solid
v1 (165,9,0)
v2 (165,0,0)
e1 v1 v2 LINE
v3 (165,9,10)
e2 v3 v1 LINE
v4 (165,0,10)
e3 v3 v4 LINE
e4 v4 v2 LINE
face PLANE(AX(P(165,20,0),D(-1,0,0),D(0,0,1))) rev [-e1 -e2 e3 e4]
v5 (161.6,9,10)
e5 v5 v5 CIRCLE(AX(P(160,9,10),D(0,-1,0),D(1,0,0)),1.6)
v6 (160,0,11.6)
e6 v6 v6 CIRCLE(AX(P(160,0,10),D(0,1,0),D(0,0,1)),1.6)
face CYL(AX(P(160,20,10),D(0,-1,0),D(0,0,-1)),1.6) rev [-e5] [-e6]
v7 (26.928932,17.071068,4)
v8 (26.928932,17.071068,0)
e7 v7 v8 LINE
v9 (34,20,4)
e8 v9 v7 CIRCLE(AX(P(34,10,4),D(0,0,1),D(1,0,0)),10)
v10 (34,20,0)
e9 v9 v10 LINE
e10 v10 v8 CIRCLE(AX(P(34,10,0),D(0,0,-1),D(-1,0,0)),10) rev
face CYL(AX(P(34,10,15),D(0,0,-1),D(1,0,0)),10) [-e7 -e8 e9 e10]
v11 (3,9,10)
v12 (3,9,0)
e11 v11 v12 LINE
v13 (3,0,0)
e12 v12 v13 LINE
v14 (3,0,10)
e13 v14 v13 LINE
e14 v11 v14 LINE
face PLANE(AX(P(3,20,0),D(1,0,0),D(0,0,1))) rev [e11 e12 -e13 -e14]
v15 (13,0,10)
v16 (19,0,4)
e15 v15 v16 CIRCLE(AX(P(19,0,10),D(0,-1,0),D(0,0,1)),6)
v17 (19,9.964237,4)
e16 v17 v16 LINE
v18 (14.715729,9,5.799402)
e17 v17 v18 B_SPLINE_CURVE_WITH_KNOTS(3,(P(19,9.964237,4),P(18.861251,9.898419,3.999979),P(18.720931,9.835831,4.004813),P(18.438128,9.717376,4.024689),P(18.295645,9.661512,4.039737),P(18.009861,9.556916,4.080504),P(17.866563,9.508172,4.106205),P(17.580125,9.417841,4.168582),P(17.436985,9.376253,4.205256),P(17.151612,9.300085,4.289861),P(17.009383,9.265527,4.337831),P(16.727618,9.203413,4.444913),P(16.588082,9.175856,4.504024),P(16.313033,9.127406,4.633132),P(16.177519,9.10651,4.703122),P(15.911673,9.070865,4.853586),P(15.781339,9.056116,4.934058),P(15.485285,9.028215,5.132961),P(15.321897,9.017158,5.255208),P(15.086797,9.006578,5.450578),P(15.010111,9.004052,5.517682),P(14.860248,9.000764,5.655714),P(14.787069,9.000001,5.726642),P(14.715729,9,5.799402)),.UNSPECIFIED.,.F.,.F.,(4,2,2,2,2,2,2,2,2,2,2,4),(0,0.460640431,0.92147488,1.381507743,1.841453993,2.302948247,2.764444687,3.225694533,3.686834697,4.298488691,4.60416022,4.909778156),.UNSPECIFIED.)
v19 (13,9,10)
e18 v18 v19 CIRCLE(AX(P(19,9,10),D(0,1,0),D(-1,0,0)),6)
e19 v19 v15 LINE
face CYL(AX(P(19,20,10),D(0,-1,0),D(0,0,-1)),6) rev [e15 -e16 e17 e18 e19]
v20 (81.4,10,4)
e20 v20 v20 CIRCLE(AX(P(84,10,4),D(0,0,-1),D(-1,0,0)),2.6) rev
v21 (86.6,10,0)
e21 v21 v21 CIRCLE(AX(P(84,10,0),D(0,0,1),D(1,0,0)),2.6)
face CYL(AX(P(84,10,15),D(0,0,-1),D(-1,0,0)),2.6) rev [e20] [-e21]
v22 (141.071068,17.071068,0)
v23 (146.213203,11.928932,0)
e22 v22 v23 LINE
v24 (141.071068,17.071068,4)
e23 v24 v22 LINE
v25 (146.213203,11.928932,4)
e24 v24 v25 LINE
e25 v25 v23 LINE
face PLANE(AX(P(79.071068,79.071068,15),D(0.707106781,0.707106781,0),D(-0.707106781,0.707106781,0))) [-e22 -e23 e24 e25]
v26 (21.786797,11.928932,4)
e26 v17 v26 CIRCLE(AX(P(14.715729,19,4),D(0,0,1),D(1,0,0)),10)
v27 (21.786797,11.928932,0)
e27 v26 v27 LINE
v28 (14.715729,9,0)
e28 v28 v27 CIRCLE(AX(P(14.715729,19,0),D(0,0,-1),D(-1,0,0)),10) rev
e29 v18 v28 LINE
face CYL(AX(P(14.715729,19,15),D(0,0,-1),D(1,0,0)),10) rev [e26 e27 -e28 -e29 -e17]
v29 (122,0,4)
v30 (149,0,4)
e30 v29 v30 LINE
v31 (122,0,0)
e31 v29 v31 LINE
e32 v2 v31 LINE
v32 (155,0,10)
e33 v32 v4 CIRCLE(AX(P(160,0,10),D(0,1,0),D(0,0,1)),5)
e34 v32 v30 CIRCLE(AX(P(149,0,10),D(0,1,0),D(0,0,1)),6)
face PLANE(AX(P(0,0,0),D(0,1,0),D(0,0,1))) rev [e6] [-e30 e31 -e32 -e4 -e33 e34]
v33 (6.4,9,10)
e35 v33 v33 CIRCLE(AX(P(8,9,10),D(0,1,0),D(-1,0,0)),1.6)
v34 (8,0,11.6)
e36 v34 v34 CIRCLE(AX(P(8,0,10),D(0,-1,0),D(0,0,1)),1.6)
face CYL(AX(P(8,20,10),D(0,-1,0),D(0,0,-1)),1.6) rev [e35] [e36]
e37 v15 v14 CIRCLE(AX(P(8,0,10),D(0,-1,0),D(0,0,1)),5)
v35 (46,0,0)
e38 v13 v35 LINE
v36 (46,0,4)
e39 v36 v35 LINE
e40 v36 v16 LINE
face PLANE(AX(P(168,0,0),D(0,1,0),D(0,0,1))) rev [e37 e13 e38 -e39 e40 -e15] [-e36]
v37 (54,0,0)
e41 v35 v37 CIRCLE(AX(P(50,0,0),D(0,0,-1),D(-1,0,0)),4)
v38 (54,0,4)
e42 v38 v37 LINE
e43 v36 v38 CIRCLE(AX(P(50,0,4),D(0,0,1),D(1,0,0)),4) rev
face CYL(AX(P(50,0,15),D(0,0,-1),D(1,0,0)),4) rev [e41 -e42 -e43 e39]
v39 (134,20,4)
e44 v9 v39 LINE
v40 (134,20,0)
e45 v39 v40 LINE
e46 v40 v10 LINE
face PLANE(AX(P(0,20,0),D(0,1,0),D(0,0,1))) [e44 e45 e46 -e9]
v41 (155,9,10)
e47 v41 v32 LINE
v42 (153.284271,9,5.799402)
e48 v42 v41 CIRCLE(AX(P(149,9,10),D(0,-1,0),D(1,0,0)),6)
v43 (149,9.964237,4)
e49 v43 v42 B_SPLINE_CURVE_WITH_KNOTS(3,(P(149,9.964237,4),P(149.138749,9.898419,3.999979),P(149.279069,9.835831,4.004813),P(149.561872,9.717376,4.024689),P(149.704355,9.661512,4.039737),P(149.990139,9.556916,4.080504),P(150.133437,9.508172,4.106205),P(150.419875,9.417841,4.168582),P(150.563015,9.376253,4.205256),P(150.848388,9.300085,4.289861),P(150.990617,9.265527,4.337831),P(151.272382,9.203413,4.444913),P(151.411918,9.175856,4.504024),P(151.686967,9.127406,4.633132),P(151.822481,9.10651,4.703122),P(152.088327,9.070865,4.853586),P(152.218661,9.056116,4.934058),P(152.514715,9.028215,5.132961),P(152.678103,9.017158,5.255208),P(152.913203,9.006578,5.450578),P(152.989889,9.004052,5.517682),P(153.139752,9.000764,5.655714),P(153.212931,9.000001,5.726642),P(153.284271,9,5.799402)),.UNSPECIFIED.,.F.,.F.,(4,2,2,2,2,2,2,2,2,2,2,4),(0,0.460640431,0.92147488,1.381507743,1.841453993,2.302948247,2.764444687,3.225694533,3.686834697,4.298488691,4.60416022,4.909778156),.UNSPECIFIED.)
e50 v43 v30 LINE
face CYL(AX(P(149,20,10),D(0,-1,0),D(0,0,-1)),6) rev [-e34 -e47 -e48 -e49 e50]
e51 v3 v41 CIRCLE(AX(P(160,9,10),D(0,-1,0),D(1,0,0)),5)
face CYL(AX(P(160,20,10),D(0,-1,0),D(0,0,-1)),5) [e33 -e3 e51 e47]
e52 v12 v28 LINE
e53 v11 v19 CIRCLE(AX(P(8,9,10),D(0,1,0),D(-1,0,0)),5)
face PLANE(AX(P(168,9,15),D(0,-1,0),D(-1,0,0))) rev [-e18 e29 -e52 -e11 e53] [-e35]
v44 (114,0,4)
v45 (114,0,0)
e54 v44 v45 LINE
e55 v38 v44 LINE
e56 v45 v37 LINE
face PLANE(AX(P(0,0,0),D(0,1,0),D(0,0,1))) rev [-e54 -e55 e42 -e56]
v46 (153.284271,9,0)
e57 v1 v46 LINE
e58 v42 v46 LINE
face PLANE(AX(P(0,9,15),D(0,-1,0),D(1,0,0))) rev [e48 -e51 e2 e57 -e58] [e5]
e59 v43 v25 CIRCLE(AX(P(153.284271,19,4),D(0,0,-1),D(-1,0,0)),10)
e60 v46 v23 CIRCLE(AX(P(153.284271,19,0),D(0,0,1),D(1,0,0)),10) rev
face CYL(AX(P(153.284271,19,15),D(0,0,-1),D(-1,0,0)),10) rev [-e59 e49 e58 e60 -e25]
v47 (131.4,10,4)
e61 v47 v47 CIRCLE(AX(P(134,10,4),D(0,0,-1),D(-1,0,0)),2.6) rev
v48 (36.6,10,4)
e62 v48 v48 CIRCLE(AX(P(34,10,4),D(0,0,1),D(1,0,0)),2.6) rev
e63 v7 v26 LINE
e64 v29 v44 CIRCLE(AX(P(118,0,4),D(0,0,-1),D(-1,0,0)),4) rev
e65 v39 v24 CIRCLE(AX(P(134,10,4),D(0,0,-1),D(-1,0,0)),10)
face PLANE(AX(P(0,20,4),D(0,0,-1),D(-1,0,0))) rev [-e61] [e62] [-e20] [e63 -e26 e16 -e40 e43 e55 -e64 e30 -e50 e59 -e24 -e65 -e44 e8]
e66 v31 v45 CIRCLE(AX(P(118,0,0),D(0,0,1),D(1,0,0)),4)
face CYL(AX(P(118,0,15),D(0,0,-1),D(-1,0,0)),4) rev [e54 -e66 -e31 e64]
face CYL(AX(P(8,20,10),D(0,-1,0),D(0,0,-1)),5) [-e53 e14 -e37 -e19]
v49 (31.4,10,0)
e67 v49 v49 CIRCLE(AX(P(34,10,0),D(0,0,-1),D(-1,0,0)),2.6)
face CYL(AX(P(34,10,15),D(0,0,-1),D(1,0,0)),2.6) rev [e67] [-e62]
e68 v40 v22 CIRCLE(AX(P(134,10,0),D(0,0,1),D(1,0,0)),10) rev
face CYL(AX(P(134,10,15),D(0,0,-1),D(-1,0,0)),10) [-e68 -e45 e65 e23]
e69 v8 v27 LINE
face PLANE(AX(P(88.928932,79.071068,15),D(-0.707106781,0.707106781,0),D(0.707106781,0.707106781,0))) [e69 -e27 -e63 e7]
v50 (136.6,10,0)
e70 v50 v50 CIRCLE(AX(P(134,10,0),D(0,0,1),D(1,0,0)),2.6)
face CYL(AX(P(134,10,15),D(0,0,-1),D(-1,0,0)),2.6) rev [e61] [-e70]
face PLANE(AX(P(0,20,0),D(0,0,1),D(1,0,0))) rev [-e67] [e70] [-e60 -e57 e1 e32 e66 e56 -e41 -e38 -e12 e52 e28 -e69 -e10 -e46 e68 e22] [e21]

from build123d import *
from build123d.topology import SkipClean

# Parameters (mm, degrees)
SKETCH1_R           = 1.6
BOSS_EXTRUDE1_DEPTH = 20
SKETCH3_R           = 2.6
BOSS_EXTRUDE2_DEPTH = 15


with BuildPart() as part:
    # Sketch1 → Boss-Extrude1 (new body)
    with BuildSketch(Plane(origin=(0, 0, 0), x_dir=(1, 0, 0), z_dir=(0, 1, 0))):
        with BuildLine():
            Line((165, -10), (165, 0))
            Line((165, 0), (84, 0))
            Line((84, 0), (84, -4))
            Line((84, -4), (149, -4))
            ThreePointArc((149, -4), (153.242640687, -5.757359313), (155, -10))
            ThreePointArc((155, -10), (160, -15), (165, -10))
        make_face()
        with Locations(Location((160, -10, 0), (0, 0, 270))):
            Circle(SKETCH1_R, mode=Mode.SUBTRACT)
    extrude(amount=BOSS_EXTRUDE1_DEPTH)


with BuildPart() as body_2:
    # Sketch3 → Boss-Extrude2 (new, through all)
    with BuildSketch(Plane.XY):
        with BuildLine():
            Line((122, 0), (165, 0))
            Line((165, 0), (165, 9))
            Line((165, 9), (153.284271247, 9))
            ThreePointArc((153.284271247, 9), (149.457436924, 9.761204675), (146.213203436, 11.928932188))
            Line((146.213203436, 11.928932188), (141.071067812, 17.071067812))
            ThreePointArc((141.071067812, 17.071067812), (137.826834324, 19.238795325), (134, 20))
            Line((134, 20), (84, 20))
            Line((84, 20), (84, 12.6))
            ThreePointArc((84, 12.6), (85.838477631, 11.838477631), (86.6, 10))
            ThreePointArc((86.6, 10), (85.838477631, 8.161522369), (84, 7.4))
            Line((84, 7.4), (84, 0))
            Line((84, 0), (114, 0))
            ThreePointArc((114, 0), (118, 4), (122, 0))
        make_face()
        with Locations((134, 10)):
            Circle(SKETCH3_R, mode=Mode.SUBTRACT)
    extrude(amount=BOSS_EXTRUDE2_DEPTH)

    # Intersect1: read off the stored shape, not the designer's step
    # Intersect1: intersect part
    add(part.part, mode=Mode.INTERSECT)

    # Mirror1: body 2 across face


with BuildPart() as body_2_1:
    with SkipClean():  # the faces are left unmerged after this step: merging them gives an invalid solid
        add(body_2.part)
        add(body_2.part.mirror(Plane(origin=(84, 16.3, 2), x_dir=(0, 0, 1), z_dir=(-1, 0, 0))))


solid = body_2_1.part
